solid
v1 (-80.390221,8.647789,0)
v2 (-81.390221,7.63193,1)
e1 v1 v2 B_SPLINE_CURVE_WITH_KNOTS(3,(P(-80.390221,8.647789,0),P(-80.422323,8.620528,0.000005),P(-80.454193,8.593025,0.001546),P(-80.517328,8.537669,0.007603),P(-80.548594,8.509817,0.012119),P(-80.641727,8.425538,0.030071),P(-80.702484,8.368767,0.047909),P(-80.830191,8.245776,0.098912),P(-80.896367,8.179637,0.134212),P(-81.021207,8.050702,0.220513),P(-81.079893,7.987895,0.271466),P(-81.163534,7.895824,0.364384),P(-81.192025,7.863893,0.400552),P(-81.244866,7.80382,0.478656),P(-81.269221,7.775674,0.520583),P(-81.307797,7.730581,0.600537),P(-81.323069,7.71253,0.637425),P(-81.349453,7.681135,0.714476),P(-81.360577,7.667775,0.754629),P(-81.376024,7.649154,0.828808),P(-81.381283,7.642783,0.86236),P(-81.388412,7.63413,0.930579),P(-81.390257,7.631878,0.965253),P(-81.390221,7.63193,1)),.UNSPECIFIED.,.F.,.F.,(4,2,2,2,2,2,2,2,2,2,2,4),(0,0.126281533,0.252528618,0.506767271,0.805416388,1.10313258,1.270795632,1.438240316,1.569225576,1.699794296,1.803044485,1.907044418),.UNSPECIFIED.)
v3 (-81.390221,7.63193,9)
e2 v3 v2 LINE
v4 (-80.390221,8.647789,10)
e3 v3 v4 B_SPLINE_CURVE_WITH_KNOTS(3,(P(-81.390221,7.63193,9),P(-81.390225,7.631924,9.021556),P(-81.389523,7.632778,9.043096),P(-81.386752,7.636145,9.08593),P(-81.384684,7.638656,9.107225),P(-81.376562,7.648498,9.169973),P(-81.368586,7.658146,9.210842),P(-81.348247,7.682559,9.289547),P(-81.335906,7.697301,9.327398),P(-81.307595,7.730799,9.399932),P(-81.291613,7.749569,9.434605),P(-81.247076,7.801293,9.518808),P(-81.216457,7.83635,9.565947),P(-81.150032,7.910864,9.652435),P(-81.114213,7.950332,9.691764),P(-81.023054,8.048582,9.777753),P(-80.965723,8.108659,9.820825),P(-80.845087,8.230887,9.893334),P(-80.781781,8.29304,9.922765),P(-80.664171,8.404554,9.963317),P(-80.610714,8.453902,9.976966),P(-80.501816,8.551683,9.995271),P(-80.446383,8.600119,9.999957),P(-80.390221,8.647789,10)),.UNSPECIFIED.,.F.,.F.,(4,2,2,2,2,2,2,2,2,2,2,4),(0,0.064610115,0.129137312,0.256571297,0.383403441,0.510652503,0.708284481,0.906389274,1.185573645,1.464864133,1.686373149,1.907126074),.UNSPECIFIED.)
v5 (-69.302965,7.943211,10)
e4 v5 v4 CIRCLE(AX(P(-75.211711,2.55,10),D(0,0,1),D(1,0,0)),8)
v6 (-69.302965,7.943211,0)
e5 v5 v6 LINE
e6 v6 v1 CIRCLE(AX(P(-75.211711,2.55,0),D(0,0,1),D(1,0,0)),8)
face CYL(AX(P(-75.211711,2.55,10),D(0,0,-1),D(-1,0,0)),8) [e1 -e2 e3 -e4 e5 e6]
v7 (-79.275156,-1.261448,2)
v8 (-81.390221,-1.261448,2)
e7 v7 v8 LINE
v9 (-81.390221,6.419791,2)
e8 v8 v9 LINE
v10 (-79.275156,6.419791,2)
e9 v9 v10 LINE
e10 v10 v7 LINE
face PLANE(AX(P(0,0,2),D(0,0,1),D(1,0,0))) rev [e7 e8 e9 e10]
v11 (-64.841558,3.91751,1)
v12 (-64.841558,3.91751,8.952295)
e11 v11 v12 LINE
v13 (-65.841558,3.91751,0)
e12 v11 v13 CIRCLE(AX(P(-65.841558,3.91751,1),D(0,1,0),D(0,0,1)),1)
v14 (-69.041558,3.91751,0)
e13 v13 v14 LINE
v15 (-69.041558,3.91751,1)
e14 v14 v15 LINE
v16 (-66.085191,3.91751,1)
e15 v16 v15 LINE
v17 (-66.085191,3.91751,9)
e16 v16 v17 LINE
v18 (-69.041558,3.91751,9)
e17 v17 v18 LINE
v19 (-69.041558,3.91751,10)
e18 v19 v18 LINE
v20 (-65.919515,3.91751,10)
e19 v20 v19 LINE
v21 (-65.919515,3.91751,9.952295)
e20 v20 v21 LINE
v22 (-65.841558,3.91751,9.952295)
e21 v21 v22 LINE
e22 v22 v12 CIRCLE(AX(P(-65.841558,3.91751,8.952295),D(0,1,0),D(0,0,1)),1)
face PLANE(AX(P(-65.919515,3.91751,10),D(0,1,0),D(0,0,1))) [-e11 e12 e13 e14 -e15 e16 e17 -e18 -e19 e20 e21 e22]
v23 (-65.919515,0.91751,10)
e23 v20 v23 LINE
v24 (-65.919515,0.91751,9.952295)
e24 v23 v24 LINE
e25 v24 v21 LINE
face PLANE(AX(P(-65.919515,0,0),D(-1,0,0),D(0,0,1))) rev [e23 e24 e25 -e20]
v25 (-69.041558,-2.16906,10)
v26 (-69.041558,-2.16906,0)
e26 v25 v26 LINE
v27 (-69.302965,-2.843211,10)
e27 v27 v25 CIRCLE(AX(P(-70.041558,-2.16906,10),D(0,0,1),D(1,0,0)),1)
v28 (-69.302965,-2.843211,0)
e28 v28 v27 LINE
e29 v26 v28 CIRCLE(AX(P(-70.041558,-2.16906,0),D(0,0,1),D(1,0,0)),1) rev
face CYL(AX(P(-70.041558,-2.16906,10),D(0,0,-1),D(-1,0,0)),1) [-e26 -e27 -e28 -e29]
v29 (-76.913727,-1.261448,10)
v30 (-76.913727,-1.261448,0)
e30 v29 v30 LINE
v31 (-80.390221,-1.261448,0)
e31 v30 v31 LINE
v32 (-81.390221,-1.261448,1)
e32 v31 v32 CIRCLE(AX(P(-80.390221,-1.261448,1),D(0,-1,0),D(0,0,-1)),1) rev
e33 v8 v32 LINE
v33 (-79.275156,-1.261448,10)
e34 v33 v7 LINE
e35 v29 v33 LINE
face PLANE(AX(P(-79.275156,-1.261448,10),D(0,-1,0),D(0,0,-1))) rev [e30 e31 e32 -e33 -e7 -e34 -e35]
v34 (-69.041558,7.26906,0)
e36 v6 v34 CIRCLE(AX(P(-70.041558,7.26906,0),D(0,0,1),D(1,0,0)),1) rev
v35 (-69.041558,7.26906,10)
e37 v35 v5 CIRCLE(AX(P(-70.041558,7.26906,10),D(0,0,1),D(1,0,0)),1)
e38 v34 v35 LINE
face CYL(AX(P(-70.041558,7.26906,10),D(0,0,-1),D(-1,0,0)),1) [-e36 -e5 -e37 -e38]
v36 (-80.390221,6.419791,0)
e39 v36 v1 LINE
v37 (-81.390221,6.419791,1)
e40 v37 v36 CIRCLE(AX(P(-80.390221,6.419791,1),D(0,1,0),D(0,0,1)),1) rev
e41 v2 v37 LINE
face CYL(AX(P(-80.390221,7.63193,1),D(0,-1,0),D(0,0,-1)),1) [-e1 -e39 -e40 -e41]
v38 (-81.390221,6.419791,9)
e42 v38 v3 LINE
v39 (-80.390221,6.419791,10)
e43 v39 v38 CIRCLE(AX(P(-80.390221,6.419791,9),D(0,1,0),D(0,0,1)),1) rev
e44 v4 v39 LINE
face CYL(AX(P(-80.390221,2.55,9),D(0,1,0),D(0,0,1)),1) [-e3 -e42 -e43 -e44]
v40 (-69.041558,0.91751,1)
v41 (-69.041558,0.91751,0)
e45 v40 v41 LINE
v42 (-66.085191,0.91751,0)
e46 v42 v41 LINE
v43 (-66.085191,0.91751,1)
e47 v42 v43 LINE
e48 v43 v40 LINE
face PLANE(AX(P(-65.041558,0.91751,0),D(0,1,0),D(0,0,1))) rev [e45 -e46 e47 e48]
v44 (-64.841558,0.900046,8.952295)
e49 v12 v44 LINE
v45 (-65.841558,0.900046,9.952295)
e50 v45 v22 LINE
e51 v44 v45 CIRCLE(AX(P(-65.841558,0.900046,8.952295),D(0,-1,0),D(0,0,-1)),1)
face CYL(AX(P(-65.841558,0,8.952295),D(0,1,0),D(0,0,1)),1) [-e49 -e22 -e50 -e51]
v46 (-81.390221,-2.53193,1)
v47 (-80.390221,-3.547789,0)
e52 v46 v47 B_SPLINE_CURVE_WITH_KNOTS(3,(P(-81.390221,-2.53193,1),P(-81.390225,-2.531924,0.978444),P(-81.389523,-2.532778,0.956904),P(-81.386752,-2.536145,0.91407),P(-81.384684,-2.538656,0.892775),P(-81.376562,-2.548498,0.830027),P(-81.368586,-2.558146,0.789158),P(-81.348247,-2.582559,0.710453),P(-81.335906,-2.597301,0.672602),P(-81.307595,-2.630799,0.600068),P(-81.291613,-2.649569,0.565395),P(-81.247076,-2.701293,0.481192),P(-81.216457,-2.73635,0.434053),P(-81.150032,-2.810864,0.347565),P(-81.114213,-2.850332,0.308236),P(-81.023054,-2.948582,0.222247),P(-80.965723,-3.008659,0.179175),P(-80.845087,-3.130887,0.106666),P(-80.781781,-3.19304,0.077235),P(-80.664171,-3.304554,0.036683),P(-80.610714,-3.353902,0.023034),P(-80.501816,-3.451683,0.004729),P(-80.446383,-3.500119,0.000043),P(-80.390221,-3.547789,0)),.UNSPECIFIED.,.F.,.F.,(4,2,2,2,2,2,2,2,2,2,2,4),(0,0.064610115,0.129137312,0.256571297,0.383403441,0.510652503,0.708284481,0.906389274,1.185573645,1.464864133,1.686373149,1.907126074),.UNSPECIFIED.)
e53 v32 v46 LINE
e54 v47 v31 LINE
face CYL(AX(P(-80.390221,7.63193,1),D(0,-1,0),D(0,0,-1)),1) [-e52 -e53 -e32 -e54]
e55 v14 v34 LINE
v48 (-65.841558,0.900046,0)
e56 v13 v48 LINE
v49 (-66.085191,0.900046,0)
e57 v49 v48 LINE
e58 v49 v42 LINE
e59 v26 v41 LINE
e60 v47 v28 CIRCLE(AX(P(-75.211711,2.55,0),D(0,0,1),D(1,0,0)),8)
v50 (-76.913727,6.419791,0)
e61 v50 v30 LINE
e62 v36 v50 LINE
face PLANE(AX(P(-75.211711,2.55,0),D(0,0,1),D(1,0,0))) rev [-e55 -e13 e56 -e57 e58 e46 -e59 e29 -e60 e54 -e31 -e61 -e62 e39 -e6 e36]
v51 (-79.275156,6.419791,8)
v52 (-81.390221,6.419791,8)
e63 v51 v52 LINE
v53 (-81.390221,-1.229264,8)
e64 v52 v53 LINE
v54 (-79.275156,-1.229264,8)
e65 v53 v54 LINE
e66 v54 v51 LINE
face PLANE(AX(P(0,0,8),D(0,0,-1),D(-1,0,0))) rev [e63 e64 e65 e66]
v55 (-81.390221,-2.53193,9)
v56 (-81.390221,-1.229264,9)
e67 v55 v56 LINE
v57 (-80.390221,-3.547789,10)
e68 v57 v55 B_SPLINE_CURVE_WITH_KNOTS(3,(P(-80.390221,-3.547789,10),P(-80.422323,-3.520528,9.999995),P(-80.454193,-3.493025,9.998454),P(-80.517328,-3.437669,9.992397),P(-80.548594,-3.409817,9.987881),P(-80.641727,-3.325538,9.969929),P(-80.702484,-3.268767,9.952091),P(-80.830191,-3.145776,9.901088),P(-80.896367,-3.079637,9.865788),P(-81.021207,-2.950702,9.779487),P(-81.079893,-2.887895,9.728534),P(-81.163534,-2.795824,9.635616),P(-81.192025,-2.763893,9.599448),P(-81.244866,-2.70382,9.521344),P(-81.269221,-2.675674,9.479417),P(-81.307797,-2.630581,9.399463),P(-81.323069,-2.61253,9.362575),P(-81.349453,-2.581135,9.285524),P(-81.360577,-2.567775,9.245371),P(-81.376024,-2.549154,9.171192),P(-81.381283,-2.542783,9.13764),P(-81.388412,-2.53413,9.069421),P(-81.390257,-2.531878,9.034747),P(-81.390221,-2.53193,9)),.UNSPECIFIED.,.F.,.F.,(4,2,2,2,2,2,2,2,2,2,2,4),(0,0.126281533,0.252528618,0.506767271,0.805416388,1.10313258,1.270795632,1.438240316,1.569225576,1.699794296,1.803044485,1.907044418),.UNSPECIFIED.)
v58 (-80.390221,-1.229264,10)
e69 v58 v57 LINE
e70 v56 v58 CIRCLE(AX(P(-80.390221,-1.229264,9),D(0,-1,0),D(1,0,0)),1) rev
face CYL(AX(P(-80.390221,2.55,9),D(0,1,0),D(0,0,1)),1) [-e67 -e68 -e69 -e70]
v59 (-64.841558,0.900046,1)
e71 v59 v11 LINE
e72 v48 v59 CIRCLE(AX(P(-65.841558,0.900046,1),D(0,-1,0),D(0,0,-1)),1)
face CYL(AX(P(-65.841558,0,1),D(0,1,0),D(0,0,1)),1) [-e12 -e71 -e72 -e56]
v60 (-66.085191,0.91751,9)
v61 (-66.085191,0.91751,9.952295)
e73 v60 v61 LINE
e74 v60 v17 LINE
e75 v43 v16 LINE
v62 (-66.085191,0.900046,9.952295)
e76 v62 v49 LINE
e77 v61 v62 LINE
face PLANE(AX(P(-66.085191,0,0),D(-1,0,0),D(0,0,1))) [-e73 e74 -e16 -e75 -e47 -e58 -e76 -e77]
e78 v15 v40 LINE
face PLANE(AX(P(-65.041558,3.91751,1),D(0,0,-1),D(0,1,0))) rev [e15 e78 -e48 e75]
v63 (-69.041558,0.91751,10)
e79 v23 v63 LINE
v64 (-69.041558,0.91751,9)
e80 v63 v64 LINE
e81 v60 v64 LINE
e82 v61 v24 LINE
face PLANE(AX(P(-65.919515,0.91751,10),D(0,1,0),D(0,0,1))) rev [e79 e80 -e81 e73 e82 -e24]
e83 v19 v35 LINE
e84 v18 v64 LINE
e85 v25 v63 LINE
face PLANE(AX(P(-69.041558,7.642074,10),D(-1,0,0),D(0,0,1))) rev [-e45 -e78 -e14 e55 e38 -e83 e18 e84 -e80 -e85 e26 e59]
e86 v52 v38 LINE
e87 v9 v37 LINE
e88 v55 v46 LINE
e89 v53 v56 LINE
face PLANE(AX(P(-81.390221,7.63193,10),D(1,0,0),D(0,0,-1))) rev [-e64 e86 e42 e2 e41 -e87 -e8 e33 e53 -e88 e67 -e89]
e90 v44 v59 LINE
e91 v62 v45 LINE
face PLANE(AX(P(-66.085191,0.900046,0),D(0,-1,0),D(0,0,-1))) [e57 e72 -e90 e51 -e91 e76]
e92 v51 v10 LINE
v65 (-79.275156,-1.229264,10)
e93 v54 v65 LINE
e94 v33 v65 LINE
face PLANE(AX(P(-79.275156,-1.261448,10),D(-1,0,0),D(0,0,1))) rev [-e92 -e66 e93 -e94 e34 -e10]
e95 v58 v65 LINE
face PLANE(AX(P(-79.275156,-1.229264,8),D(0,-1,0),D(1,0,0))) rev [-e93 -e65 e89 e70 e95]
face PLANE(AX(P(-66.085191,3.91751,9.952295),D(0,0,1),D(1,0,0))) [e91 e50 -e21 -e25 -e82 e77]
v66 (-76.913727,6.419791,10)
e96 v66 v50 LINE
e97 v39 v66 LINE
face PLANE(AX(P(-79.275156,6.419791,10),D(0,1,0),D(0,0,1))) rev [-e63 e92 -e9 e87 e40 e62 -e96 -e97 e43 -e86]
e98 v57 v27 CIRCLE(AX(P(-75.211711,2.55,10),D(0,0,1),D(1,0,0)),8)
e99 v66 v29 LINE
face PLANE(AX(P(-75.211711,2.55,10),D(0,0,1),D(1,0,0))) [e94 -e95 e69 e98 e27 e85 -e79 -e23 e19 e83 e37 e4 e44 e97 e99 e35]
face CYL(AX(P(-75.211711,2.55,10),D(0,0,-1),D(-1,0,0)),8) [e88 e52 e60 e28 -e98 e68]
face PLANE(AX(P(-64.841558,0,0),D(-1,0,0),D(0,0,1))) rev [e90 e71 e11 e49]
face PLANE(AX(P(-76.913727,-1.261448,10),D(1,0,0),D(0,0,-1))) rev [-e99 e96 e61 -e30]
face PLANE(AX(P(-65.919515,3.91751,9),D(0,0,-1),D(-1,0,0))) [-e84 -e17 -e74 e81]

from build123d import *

# Parameters (mm, degrees)
SKETCH_1_R            = 8
EXTRUDE_1_DEPTH       = 10
SKETCH_9_W            = 7.120641766
SKETCH_9_H            = 4.534999238
EXTRUDE_6_DEPTH       = 1
SKETCH_11_W           = 1.257653538
SKETCH_11_H           = 9
EXTRUDE_7_DEPTH       = 4.5
EXTRUDE_8_DEPTH       = 6
FILLET_8_R            = 1
FILLET_9_R            = 1
CUT_EXTRUDE_1_DEPTH   = 10
SKETCH_14_W           = 1
SKETCH_14_H           = 3
EXTRUDE_9_DEPTH       = 3.122043073
SKETCH_15_W           = 1
SKETCH_15_H           = 3
EXTRUDE_10_DEPTH      = 4
EXTRUDE_11_DEPTH      = 0.2
EXTRUDE_11_DEPTH_BACK = 1.043632387
SKETCH_16_W           = 9.952294967
SKETCH_16_H           = 3.01746433
FILLET_11_R           = 1
FILLET_12_R           = 1
FILLET_13_R           = 1
FILLET_14_R           = 1
CUT_EXTRUDE_2_DEPTH   = 10
SKETCH_18_W           = 2.361428176
SKETCH_18_H           = 7.68123899
CUT_EXTRUDE_3_DEPTH   = 10
SKETCH_19_W           = 2.115065294
SKETCH_19_H           = 7.68123899
CUT_EXTRUDE_4_DEPTH   = 2
SKETCH_20_W           = 2.115065294
SKETCH_20_H           = 7.649055087
CUT_EXTRUDE_5_DEPTH   = 2
FILLET_15_R           = 1
FILLET_16_R           = 1
FILLET_17_R           = 1
FILLET_18_R           = 1


with BuildPart() as part:
    # 草圖1 → 填料-伸長1 (new body)
    with BuildSketch(Plane(origin=(0.382706605, 0, 0), x_dir=(1, 0, 0), z_dir=(0, 0, 1))):
        with Locations((-75.594417438, 2.55)):
            Circle(SKETCH_1_R)
    extrude(amount=EXTRUDE_1_DEPTH)

    # 草圖9 → 填料-伸長6 (add)
    with BuildSketch(Plane(origin=(6.127831546, 0, 9), x_dir=(1, 0, 0), z_dir=(0, 0, 1))):
        with Locations((-75.644850643, 2.267499619)):
            Rectangle(SKETCH_9_W, SKETCH_9_H)
    extrude(amount=EXTRUDE_6_DEPTH)



with BuildPart() as body_2:
    # 草圖11 → 填料-伸長7 (new body)
    with BuildSketch(Plane(origin=(9.574526933, 4.534999238, 0.48426017), x_dir=(1, 0, 0), z_dir=(0, 1, 0))):
        with Locations((-76.184774061, -4.5)):
            Rectangle(SKETCH_11_W, SKETCH_11_H)
    extrude(amount=-EXTRUDE_7_DEPTH)


with BuildPart() as part_1:
    add(part.part)

    add(body_2.part)  # 填料-伸長8 merges body 2
    # 草圖12 → 填料-伸長8 (add)
    with BuildSketch(Plane.ZY.offset(67.239073897)):
        Polygon((0.48426017, 4.534999238), (0.48426017, 0), (1.483647509, 0.034999238), (1.483647509, 4.534999238), align=None)
    extrude(amount=EXTRUDE_8_DEPTH)

    # 圓角8
    fillet_8_edges = [part_1.edges().sort_by_distance(p)[0] for p in [
        (-65.981420359, 2.284999238, 0.48426017),
    ]]
    fillet(fillet_8_edges, radius=FILLET_8_R)

    # 圓角9
    fillet_9_edges = [part_1.edges().sort_by_distance(p)[0] for p in [
        (-65.956698214, 2.267499619, 10),
    ]]
    fillet(fillet_9_edges, radius=FILLET_9_R - 0.0001)  # a hair under: the kernel refuses the full size

    # 草圖13 → 除料-伸長1 (cut)
    with BuildSketch(Plane(origin=(0, 0, 0), x_dir=(-1, 0, 0), z_dir=(0, 0, -1))):
        with BuildLine():
            Line((69.041558468, 7.642074214), (69.041558468, -2.542074214))
            ThreePointArc((69.041558468, -2.542074214), (63.949484255, 2.55), (69.041558468, 7.642074214))
        make_face()
    extrude(amount=-CUT_EXTRUDE_1_DEPTH, mode=Mode.SUBTRACT)

    # 草圖14 → 填料-伸長9 (add)
    with BuildSketch(Plane(origin=(-69.041558468, 0, 0), x_dir=(0, 0, -1), z_dir=(1, 0, 0))):
        with Locations((-9.5, 2.417510407)):
            Rectangle(SKETCH_14_W, SKETCH_14_H)
    extrude(amount=EXTRUDE_9_DEPTH)

    # 草圖15 → 填料-伸長10 (add)
    with BuildSketch(Plane(origin=(-69.041558468, 0, 0), x_dir=(0, 0, -1), z_dir=(1, 0, 0))):
        with Locations((-0.5, 2.417510407)):
            Rectangle(SKETCH_15_W, SKETCH_15_H)
    extrude(amount=EXTRUDE_10_DEPTH)

    # 草圖16 → 填料-伸長11 (add, two sides: drawn at the far end of the back side and taken through both)
    with BuildSketch(Plane(origin=(-65.041558468, 0, 0), x_dir=(0, 0, -1), z_dir=(1, 0, 0)).offset(-EXTRUDE_11_DEPTH_BACK)):
        with Locations((-4.976147484, 2.408778242)):
            Rectangle(SKETCH_16_W, SKETCH_16_H)
    extrude(amount=EXTRUDE_11_DEPTH + EXTRUDE_11_DEPTH_BACK)

    # 圓角11
    fillet_11_edges = [part_1.edges().sort_by_distance(p)[0] for p in [
        (-64.841558468, 2.408778242, 0),
    ]]
    fillet(fillet_11_edges, radius=FILLET_11_R)

    # 圓角12
    fillet_12_edges = [part_1.edges().sort_by_distance(p)[0] for p in [
        (-64.841558468, 2.408778242, 9.952294967),
    ]]
    fillet(fillet_12_edges, radius=FILLET_12_R)

    # 圓角13
    fillet_13_edges = [part_1.edges().sort_by_distance(p)[0] for p in [
        (-69.041558468, 7.642074214, 5),
    ]]
    fillet(fillet_13_edges, radius=FILLET_13_R)

    # 圓角14
    fillet_14_edges = [part_1.edges().sort_by_distance(p)[0] for p in [
        (-69.041558468, -2.542074214, 5),
    ]]
    fillet(fillet_14_edges, radius=FILLET_14_R)

    # 草圖17 → 除料-伸長2 (cut)
    with BuildSketch(Plane(origin=(0, 0, 0), x_dir=(-1, 0, 0), z_dir=(0, 0, -1))):
        with BuildLine():
            Line((81.390220844, 7.631930149), (81.390220844, -2.531930149))
            ThreePointArc((81.390220844, -2.531930149), (84.200552216, 2.55), (81.390220844, 7.631930149))
        make_face()
    extrude(amount=-CUT_EXTRUDE_2_DEPTH, mode=Mode.SUBTRACT)

    # 草圖18 → 除料-伸長3 (cut)
    with BuildSketch(Plane(origin=(0, 0, 0), x_dir=(-1, 0, 0), z_dir=(0, 0, -1))):
        with Locations((78.094441462, 2.579171883)):
            Rectangle(SKETCH_18_W, SKETCH_18_H)
    extrude(amount=-CUT_EXTRUDE_3_DEPTH, mode=Mode.SUBTRACT)

    # 草圖19 → 除料-伸長4 (cut)
    with BuildSketch(Plane(origin=(0, 0, 0), x_dir=(-1, 0, 0), z_dir=(0, 0, -1))):
        with Locations((80.332688197, 2.579171883)):
            Rectangle(SKETCH_19_W, SKETCH_19_H)
    extrude(amount=-CUT_EXTRUDE_4_DEPTH, mode=Mode.SUBTRACT)

    # 草圖20 → 除料-伸長5 (cut)
    with BuildSketch(Plane.XY.offset(10)):
        with Locations((-80.332688197, 2.595263834)):
            Rectangle(SKETCH_20_W, SKETCH_20_H)
    extrude(amount=-CUT_EXTRUDE_5_DEPTH, mode=Mode.SUBTRACT)

    # 圓角15
    fillet_15_edges = [part_1.edges().sort_by_distance(p)[0] for p in [
        (-81.390220844, 7.025860764, 0),
    ]]
    fillet(fillet_15_edges, radius=FILLET_15_R)

    # 圓角16
    fillet_16_edges = [part_1.edges().sort_by_distance(p)[0] for p in [
        (-81.390220844, 7.025860764, 10),
    ]]
    fillet(fillet_16_edges, radius=FILLET_16_R)

    # 圓角17
    fillet_17_edges = [part_1.edges().sort_by_distance(p)[0] for p in [
        (-81.390220844, -1.89668888, 0),
    ]]
    fillet(fillet_17_edges, radius=FILLET_17_R)

    # 圓角18
    fillet_18_edges = [part_1.edges().sort_by_distance(p)[0] for p in [
        (-81.390220844, -1.880596929, 10),
    ]]
    fillet(fillet_18_edges, radius=FILLET_18_R)


solid = part_1.part
